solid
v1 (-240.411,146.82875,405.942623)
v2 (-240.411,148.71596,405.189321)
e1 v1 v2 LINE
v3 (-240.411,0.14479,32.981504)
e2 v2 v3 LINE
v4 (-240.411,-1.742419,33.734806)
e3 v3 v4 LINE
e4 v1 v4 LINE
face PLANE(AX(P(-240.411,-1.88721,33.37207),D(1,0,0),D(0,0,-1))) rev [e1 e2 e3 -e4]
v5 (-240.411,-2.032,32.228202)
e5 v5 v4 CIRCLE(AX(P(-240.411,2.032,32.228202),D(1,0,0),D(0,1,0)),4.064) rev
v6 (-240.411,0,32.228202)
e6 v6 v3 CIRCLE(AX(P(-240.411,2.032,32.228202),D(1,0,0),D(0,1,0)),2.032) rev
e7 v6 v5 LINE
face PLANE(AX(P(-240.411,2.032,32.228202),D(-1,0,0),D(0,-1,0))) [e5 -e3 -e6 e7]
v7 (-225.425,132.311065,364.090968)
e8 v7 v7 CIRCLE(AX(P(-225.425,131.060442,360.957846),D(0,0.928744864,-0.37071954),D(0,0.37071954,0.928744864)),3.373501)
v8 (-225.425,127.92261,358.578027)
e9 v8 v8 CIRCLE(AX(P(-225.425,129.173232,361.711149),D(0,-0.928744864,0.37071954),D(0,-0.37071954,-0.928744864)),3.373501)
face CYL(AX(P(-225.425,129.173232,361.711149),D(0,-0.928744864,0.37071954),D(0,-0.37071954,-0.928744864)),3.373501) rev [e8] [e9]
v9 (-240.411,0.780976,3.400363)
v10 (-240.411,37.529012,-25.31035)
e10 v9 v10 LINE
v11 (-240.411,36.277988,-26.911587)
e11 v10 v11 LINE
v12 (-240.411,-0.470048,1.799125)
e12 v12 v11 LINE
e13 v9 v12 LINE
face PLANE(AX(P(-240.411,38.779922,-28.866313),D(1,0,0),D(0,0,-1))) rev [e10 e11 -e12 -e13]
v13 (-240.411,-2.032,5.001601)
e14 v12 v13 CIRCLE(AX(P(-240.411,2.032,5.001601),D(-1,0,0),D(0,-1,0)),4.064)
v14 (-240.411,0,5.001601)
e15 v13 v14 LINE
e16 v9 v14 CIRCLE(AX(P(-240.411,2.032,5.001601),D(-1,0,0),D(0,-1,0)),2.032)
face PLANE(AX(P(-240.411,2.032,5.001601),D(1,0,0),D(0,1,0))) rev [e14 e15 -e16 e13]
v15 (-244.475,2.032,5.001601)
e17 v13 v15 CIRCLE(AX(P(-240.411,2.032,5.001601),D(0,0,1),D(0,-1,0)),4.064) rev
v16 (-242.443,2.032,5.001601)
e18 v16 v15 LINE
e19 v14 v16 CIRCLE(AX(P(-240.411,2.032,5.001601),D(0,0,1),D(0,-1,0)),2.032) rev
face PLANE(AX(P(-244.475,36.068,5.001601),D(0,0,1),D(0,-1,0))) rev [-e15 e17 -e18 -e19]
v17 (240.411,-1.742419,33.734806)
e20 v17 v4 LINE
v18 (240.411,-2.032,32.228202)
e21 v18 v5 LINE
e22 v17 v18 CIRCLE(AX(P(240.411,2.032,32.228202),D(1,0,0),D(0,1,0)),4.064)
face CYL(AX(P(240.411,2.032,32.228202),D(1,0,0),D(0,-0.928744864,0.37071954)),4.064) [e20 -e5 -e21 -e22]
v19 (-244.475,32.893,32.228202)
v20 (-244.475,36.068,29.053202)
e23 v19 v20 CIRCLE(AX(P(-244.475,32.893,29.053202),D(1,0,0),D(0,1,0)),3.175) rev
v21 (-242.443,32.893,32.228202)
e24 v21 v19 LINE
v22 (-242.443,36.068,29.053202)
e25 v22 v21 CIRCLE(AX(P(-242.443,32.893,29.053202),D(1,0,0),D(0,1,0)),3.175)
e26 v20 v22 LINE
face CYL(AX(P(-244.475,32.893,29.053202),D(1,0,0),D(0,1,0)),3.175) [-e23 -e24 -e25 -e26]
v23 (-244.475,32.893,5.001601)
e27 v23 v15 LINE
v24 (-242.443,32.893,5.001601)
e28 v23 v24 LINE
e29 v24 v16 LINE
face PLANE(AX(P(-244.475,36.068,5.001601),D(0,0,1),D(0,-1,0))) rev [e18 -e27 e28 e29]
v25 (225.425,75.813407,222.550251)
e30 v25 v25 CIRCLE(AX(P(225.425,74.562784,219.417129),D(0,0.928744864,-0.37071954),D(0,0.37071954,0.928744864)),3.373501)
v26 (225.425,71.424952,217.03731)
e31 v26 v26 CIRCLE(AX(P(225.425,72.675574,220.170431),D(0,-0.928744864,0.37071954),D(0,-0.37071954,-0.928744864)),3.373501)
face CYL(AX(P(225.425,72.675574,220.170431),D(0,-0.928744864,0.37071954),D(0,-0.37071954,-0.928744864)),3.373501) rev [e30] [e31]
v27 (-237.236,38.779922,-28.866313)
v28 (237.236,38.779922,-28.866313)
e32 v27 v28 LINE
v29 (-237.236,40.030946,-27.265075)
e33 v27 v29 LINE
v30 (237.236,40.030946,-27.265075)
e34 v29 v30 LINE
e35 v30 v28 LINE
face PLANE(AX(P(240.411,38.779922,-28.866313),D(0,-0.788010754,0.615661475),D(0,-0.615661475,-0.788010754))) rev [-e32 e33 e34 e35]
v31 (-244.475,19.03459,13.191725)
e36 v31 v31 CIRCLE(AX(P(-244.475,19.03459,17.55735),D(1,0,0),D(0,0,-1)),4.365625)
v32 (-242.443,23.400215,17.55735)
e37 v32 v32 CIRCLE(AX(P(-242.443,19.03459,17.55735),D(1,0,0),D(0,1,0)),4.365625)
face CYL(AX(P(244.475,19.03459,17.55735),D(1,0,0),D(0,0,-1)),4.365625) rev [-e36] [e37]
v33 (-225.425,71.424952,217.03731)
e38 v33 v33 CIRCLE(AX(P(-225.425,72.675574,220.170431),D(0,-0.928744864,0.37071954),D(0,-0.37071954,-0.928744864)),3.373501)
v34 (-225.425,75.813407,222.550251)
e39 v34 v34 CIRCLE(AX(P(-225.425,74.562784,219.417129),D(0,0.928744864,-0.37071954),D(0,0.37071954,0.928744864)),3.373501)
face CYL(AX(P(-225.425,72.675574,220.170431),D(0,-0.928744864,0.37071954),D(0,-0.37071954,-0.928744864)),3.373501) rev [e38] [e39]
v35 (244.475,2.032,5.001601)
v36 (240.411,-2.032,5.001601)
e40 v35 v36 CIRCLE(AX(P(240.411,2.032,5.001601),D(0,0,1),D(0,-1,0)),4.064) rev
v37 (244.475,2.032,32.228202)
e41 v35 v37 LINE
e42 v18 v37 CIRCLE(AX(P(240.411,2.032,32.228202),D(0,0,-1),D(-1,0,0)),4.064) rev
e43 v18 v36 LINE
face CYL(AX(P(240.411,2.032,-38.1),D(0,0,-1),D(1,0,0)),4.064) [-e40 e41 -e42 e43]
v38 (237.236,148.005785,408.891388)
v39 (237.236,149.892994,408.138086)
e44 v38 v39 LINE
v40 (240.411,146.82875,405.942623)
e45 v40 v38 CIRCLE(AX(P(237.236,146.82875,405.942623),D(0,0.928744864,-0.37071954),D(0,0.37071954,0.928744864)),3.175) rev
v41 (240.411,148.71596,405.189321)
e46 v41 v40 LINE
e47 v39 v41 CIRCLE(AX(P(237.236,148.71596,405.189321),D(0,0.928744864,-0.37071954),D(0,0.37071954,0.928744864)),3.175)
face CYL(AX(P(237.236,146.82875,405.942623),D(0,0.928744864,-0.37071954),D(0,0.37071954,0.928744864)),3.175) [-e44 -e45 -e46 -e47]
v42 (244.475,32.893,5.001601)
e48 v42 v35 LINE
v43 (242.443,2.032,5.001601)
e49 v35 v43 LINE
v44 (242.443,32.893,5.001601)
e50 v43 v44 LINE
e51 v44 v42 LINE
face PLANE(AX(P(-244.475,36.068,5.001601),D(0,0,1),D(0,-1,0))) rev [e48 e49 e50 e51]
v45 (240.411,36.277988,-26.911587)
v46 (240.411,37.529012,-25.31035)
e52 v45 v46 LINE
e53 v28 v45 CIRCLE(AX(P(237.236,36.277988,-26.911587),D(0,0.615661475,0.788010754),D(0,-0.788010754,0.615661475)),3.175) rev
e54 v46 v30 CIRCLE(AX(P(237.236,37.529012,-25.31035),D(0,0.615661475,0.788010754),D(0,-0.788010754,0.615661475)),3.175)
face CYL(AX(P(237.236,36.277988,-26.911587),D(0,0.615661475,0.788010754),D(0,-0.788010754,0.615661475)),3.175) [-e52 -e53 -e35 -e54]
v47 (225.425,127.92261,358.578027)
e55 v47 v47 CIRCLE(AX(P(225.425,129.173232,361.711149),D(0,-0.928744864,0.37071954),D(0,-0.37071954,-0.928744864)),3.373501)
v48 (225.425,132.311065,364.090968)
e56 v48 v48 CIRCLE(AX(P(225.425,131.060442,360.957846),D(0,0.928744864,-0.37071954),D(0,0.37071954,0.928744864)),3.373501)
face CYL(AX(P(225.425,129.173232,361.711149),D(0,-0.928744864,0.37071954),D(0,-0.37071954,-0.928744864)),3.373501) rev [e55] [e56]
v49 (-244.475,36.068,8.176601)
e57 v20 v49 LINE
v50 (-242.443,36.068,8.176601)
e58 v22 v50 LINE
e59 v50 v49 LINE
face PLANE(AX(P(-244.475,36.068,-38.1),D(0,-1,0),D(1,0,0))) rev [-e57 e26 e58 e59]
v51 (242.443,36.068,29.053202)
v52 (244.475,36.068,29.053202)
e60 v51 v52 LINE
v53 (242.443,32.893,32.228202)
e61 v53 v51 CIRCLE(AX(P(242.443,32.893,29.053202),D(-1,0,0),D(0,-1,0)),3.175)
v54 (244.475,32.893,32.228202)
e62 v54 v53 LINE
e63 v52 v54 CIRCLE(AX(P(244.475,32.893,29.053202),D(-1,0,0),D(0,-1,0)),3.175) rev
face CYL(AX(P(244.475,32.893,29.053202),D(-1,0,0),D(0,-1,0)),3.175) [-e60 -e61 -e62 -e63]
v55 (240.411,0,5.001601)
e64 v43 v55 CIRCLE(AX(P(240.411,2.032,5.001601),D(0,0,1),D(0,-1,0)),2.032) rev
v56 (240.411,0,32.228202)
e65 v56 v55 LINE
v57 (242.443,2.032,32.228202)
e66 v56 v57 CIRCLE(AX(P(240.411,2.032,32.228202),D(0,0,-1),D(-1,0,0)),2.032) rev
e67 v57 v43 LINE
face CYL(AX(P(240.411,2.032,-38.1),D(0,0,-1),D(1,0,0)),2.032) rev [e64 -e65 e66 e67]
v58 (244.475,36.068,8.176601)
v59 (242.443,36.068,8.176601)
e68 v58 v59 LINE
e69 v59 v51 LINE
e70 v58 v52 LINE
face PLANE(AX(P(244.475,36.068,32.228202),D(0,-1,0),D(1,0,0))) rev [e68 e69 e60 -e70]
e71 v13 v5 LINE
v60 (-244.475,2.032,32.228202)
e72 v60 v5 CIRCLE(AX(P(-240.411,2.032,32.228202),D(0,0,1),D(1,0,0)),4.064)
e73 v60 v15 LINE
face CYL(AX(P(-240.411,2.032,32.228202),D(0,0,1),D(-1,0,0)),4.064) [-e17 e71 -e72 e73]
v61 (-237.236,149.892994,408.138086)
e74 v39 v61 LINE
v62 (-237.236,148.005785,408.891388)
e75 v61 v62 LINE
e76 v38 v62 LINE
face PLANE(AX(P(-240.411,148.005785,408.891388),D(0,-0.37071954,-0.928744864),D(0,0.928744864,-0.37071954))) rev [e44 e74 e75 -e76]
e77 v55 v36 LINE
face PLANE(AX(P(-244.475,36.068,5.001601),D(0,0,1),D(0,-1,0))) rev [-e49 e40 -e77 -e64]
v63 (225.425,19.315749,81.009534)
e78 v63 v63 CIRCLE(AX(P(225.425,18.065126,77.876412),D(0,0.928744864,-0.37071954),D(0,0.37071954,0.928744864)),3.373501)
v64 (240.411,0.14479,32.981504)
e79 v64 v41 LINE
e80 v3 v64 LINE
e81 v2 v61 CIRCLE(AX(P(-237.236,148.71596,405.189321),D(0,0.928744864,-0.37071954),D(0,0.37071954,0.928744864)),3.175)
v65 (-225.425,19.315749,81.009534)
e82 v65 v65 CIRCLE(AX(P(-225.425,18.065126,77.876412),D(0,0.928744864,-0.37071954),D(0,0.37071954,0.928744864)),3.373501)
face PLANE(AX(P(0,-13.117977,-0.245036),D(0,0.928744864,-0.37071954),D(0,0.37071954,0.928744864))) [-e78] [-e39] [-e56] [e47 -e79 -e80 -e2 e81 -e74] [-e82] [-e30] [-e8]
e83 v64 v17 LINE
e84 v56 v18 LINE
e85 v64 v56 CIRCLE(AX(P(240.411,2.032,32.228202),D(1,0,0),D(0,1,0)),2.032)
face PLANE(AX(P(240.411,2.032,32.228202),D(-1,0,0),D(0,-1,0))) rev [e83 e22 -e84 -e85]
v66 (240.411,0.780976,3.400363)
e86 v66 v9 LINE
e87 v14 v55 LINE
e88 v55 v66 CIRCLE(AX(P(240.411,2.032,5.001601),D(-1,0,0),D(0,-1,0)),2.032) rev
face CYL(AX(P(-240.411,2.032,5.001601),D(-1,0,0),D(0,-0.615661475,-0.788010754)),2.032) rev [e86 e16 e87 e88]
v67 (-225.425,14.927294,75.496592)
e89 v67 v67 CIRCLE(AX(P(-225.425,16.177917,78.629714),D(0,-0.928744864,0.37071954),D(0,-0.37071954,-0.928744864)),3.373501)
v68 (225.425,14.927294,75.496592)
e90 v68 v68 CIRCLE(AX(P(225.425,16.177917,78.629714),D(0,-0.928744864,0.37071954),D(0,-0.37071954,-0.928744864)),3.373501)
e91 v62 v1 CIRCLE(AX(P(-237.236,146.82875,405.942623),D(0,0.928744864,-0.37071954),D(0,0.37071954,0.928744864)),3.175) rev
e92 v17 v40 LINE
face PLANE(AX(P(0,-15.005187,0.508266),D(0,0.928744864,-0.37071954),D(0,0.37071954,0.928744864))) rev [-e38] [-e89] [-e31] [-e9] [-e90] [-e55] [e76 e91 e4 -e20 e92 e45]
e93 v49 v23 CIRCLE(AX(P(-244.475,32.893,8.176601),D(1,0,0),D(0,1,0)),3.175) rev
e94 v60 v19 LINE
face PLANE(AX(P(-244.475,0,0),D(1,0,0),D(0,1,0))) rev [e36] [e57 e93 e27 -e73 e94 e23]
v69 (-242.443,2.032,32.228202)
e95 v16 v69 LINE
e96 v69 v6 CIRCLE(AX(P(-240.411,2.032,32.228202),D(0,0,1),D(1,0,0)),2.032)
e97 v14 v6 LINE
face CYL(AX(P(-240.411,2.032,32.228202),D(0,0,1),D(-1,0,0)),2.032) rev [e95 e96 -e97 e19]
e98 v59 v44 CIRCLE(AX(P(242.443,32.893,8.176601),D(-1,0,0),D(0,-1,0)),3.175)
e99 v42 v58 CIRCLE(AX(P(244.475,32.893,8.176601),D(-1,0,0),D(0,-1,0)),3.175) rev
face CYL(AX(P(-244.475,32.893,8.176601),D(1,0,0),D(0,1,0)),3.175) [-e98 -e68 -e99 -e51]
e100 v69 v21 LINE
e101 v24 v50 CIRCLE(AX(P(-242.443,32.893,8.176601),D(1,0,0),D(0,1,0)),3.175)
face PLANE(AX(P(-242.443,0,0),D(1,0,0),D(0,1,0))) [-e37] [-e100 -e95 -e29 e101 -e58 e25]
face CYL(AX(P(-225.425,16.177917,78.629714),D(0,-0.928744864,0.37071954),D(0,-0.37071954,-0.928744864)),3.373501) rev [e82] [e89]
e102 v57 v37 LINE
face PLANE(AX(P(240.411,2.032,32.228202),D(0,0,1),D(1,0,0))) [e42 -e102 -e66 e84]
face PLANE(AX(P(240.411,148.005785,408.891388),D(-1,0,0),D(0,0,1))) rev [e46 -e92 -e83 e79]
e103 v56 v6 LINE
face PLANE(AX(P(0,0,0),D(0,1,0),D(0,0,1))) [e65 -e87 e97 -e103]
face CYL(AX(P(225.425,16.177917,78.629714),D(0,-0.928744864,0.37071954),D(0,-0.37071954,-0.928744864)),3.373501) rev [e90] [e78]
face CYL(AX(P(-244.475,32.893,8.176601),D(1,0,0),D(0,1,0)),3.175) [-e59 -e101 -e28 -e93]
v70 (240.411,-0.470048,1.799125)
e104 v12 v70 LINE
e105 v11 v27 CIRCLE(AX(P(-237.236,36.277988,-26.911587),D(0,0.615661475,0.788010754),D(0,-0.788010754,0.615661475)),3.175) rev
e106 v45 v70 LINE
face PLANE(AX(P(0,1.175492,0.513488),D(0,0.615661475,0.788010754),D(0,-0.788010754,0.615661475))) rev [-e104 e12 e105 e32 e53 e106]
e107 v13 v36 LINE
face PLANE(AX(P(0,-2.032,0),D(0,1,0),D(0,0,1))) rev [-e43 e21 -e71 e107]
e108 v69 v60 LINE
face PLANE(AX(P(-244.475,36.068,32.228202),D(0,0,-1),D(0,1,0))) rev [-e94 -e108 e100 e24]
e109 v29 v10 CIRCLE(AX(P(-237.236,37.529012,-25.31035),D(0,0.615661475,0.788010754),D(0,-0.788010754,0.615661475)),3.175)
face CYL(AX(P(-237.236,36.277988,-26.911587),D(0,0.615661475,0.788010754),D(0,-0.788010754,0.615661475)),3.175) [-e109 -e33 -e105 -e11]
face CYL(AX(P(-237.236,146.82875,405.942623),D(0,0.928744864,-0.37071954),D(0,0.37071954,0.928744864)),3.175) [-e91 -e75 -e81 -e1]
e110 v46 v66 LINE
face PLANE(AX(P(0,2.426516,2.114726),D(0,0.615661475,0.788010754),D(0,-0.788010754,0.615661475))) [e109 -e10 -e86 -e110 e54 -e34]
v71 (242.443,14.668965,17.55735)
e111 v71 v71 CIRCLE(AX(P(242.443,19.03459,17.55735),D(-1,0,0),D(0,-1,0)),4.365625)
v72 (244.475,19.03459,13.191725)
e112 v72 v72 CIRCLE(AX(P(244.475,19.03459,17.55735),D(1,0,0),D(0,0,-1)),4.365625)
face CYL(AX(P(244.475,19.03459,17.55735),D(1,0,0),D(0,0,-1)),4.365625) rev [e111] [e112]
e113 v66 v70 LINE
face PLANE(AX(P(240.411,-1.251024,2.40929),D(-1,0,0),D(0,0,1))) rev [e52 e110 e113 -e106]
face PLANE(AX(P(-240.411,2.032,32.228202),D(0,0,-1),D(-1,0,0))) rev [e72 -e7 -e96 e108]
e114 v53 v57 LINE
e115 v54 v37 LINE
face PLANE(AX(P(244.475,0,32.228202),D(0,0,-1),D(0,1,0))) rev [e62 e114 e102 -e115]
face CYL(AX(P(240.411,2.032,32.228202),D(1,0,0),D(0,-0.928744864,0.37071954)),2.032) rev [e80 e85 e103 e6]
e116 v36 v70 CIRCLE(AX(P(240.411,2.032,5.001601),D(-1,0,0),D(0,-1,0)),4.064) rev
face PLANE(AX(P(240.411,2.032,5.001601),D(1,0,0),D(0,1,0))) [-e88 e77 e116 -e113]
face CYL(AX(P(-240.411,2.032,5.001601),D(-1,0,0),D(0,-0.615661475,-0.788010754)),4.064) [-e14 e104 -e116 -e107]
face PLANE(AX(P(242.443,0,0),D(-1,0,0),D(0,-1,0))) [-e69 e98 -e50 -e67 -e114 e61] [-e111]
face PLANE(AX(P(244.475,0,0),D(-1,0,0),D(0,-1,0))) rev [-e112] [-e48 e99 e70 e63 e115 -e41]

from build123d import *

# Parameters (mm, degrees)
SKETCH1_W                        = 480.822
SKETCH1_H                        = 76.2
BASE_FLANGE1_DEPTH               = 2.032
EDGE_FLANGE3_START               = -240.411
EDGE_FLANGE3_DEPTH               = 480.822
EDGE_FLANGE3_2_DEPTH             = 480.822
EDGE_FLANGE1_DEPTH               = 70.328201504
EDGE_FLANGE1_BEND_DEPTH          = 70.328201504
EDGE_FLANGE2_DEPTH               = 480.822
F_11_32_0_34375_DIAMETER_HOLE1_D = 8.73125
F_17_64_0_26563_DIAMETER_HOLE1_D = 6.747002
FILLET1_R                        = 3.175
SKETCH25_W                       = 47.165600752
SKETCH25_H                       = 38.1
CUT_EXTRUDE1_DEPTH               = 655.776434505
EDGE_FLANGE4_DEPTH               = 480.822
FILLET2_R                        = 3.175


# Read off the part's stored shape, not the designer's step: Edge-Flange3
# Sheet-metal steps are written as plain solids
with BuildPart() as part:
    # Sketch1 → Base-Flange1 (new body)
    with BuildSketch(Plane(origin=(0, 0, 0), x_dir=(1, 0, 0), z_dir=(0, 1, 0))):
        Rectangle(SKETCH1_W, SKETCH1_H)
    extrude(amount=-BASE_FLANGE1_DEPTH)

    # Edge-Flange3 outline → Edge-Flange3 (cut)
    with BuildSketch(Plane.YZ.offset(EDGE_FLANGE3_START)):
        with BuildLine():
            ThreePointArc((-2.032, 32.228201504), (-1.958948217, 32.995292327), (-1.742419128, 33.734805713))
            Line((-1.742419128, 33.734805713), (0, 38.1))
            Line((0, 38.1), (-2.032, 38.1))
            Line((-2.032, 38.1), (-2.032, 32.228201504))
        make_face()
    extrude(amount=EDGE_FLANGE3_DEPTH, mode=Mode.SUBTRACT)

    # Edge-Flange3 2 outline → Edge-Flange3 2 (add)
    with BuildSketch(Plane.YZ.offset(EDGE_FLANGE3_START)):
        with BuildLine():
            Line((148.005784856, 408.891387665), (0, 38.1))
            Line((0, 38.1), (0, 32.228201504))
            ThreePointArc((0, 32.228201504), (0.036525892, 32.611746915), (0.144790436, 32.981503608))
            Line((0.144790436, 32.981503608), (149.89299442, 408.13808556))
            Line((149.89299442, 408.13808556), (148.005784856, 408.891387665))
        make_face()
    extrude(amount=EDGE_FLANGE3_2_DEPTH)

    # Edge-Flange1 section (across the edge) → Edge-Flange1 (add)
    with BuildSketch(Plane(origin=(-242.443, 0, -38.1), x_dir=(1, 0, 0), z_dir=(0, 0, 1))):
        with BuildLine():
            Line((-2.032, 2.032), (-2.032, 36.068))
            Line((-2.032, 36.068), (0, 36.068))
            Line((0, 36.068), (0, 2.032))
            ThreePointArc((0, 2.032), (0.595159021, 0.595159021), (2.032, 0))
            Line((2.032, 0), (2.032, -2.032))
            ThreePointArc((2.032, -2.032), (-0.841681959, -0.841681959), (-2.032, 2.032))
        make_face()
    extrude(amount=EDGE_FLANGE1_DEPTH)

    # Edge-Flange1 section 2 (across the edge) → Edge-Flange1 bend (add)
    with BuildSketch(Plane(origin=(242.443, 0, 32.228201504), x_dir=(-1, 0, 0), z_dir=(0, 0, -1))):
        with BuildLine():
            Line((-2.032, 2.032), (-2.032, 36.068))
            Line((-2.032, 36.068), (0, 36.068))
            Line((0, 36.068), (0, 2.032))
            ThreePointArc((0, 2.032), (0.595159021, 0.595159021), (2.032, 0))
            Line((2.032, 0), (2.032, -2.032))
            ThreePointArc((2.032, -2.032), (-0.841681959, -0.841681959), (-2.032, 2.032))
        make_face()
    extrude(amount=EDGE_FLANGE1_BEND_DEPTH)

    # Edge-Flange2 section (across the edge) → Edge-Flange2 (add)
    with BuildSketch(Plane(origin=(240.411, 0, -40.132), x_dir=(0, 0, 1), z_dir=(-1, 0, 0))):
        with BuildLine():
            Line((-2.032, 2.032), (-2.032, 36.068))
            Line((-2.032, 36.068), (0, 36.068))
            Line((0, 36.068), (0, 2.032))
            ThreePointArc((0, 2.032), (0.595159021, 0.595159021), (2.032, 0))
            Line((2.032, 0), (2.032, -2.032))
            ThreePointArc((2.032, -2.032), (-0.841681959, -0.841681959), (-2.032, 2.032))
        make_face()
    extrude(amount=EDGE_FLANGE2_DEPTH)

    # 11/32 (0.34375) Diameter Hole1 (through all)
    with Locations(Plane(origin=(244.475, 0, 0), x_dir=(0, 0, -1), z_dir=(1, 0, 0))):
        with Locations((-17.557349869, 19.03458979)):
            Hole(F_11_32_0_34375_DIAMETER_HOLE1_D / 2)

    # 17/64 (0.26563) Diameter Hole1 (through all)
    with Locations(Plane(origin=(0, -13.117977393, 5.236196428), x_dir=(-1, 0, 0), z_dir=(0, -0.9287448642521535, 0.370719539713311))):
        with Locations((225.425, -79.024412767), (225.425, -231.424412767), (225.425, -383.824412767), (-225.425, -383.824412767), (-225.425, -231.424412767), (-225.425, -79.024412767)):
            Hole(F_17_64_0_26563_DIAMETER_HOLE1_D / 2)

    # Fillet1
    fillet1_edges = [part.edges().sort_by_distance(p)[0] for p in [
        (-240.411, 148.949389638, 408.514736612),
        (240.411, 148.949389638, 408.514736612),
        (-243.459, 36.068, -38.1),
        (-243.459, 36.068, 32.228201504),
        (243.459, 36.068, 32.228201504),
        (243.459, 36.068, -38.1),
        (240.411, 36.068, -41.148),
        (-240.411, 36.068, -41.148),
    ]]
    fillet(fillet1_edges, radius=FILLET1_R)

    # Sketch25 → Cut-Extrude1 (cut, through all)
    with BuildSketch(Plane(origin=(244.475, 0, 0), x_dir=(0, 0, -1), z_dir=(1, 0, 0))):
        with Locations((18.581199624, 17.018)):
            Rectangle(SKETCH25_W, SKETCH25_H)
    extrude(amount=-CUT_EXTRUDE1_DEPTH, mode=Mode.SUBTRACT)

    # Edge-Flange4 section (across the edge) → Edge-Flange4 (add)
    with BuildSketch(Plane(origin=(240.411, 0, 4.010528132), x_dir=(0, 0.6156614753256621, 0.788010753606719), z_dir=(-1, 0, 0))):
        with BuildLine():
            Line((-2.032, 0.99107262), (-2.032, 50.8))
            Line((-2.032, 50.8), (0, 50.8))
            Line((0, 50.8), (0, 0.99107262))
            ThreePointArc((0, 0.99107262), (0.205650498, 0.10030245), (0.780975882, -0.610165231))
            Line((0.780975882, -0.610165231), (-0.470048236, -2.211403083))
            ThreePointArc((-0.470048236, -2.211403083), (-1.620699004, -0.790467721), (-2.032, 0.99107262))
        make_face()
    extrude(amount=EDGE_FLANGE4_DEPTH)

    # Fillet2
    fillet2_edges = [part.edges().sort_by_distance(p)[0] for p in [
        (-243.459, 36.068, 5.001600752),
        (243.459, 36.068, 5.001600752),
        (240.411, 39.405434224, -28.06569374),
        (-240.411, 39.405434224, -28.06569374),
    ]]
    fillet(fillet2_edges, radius=FILLET2_R)


solid = part.part
